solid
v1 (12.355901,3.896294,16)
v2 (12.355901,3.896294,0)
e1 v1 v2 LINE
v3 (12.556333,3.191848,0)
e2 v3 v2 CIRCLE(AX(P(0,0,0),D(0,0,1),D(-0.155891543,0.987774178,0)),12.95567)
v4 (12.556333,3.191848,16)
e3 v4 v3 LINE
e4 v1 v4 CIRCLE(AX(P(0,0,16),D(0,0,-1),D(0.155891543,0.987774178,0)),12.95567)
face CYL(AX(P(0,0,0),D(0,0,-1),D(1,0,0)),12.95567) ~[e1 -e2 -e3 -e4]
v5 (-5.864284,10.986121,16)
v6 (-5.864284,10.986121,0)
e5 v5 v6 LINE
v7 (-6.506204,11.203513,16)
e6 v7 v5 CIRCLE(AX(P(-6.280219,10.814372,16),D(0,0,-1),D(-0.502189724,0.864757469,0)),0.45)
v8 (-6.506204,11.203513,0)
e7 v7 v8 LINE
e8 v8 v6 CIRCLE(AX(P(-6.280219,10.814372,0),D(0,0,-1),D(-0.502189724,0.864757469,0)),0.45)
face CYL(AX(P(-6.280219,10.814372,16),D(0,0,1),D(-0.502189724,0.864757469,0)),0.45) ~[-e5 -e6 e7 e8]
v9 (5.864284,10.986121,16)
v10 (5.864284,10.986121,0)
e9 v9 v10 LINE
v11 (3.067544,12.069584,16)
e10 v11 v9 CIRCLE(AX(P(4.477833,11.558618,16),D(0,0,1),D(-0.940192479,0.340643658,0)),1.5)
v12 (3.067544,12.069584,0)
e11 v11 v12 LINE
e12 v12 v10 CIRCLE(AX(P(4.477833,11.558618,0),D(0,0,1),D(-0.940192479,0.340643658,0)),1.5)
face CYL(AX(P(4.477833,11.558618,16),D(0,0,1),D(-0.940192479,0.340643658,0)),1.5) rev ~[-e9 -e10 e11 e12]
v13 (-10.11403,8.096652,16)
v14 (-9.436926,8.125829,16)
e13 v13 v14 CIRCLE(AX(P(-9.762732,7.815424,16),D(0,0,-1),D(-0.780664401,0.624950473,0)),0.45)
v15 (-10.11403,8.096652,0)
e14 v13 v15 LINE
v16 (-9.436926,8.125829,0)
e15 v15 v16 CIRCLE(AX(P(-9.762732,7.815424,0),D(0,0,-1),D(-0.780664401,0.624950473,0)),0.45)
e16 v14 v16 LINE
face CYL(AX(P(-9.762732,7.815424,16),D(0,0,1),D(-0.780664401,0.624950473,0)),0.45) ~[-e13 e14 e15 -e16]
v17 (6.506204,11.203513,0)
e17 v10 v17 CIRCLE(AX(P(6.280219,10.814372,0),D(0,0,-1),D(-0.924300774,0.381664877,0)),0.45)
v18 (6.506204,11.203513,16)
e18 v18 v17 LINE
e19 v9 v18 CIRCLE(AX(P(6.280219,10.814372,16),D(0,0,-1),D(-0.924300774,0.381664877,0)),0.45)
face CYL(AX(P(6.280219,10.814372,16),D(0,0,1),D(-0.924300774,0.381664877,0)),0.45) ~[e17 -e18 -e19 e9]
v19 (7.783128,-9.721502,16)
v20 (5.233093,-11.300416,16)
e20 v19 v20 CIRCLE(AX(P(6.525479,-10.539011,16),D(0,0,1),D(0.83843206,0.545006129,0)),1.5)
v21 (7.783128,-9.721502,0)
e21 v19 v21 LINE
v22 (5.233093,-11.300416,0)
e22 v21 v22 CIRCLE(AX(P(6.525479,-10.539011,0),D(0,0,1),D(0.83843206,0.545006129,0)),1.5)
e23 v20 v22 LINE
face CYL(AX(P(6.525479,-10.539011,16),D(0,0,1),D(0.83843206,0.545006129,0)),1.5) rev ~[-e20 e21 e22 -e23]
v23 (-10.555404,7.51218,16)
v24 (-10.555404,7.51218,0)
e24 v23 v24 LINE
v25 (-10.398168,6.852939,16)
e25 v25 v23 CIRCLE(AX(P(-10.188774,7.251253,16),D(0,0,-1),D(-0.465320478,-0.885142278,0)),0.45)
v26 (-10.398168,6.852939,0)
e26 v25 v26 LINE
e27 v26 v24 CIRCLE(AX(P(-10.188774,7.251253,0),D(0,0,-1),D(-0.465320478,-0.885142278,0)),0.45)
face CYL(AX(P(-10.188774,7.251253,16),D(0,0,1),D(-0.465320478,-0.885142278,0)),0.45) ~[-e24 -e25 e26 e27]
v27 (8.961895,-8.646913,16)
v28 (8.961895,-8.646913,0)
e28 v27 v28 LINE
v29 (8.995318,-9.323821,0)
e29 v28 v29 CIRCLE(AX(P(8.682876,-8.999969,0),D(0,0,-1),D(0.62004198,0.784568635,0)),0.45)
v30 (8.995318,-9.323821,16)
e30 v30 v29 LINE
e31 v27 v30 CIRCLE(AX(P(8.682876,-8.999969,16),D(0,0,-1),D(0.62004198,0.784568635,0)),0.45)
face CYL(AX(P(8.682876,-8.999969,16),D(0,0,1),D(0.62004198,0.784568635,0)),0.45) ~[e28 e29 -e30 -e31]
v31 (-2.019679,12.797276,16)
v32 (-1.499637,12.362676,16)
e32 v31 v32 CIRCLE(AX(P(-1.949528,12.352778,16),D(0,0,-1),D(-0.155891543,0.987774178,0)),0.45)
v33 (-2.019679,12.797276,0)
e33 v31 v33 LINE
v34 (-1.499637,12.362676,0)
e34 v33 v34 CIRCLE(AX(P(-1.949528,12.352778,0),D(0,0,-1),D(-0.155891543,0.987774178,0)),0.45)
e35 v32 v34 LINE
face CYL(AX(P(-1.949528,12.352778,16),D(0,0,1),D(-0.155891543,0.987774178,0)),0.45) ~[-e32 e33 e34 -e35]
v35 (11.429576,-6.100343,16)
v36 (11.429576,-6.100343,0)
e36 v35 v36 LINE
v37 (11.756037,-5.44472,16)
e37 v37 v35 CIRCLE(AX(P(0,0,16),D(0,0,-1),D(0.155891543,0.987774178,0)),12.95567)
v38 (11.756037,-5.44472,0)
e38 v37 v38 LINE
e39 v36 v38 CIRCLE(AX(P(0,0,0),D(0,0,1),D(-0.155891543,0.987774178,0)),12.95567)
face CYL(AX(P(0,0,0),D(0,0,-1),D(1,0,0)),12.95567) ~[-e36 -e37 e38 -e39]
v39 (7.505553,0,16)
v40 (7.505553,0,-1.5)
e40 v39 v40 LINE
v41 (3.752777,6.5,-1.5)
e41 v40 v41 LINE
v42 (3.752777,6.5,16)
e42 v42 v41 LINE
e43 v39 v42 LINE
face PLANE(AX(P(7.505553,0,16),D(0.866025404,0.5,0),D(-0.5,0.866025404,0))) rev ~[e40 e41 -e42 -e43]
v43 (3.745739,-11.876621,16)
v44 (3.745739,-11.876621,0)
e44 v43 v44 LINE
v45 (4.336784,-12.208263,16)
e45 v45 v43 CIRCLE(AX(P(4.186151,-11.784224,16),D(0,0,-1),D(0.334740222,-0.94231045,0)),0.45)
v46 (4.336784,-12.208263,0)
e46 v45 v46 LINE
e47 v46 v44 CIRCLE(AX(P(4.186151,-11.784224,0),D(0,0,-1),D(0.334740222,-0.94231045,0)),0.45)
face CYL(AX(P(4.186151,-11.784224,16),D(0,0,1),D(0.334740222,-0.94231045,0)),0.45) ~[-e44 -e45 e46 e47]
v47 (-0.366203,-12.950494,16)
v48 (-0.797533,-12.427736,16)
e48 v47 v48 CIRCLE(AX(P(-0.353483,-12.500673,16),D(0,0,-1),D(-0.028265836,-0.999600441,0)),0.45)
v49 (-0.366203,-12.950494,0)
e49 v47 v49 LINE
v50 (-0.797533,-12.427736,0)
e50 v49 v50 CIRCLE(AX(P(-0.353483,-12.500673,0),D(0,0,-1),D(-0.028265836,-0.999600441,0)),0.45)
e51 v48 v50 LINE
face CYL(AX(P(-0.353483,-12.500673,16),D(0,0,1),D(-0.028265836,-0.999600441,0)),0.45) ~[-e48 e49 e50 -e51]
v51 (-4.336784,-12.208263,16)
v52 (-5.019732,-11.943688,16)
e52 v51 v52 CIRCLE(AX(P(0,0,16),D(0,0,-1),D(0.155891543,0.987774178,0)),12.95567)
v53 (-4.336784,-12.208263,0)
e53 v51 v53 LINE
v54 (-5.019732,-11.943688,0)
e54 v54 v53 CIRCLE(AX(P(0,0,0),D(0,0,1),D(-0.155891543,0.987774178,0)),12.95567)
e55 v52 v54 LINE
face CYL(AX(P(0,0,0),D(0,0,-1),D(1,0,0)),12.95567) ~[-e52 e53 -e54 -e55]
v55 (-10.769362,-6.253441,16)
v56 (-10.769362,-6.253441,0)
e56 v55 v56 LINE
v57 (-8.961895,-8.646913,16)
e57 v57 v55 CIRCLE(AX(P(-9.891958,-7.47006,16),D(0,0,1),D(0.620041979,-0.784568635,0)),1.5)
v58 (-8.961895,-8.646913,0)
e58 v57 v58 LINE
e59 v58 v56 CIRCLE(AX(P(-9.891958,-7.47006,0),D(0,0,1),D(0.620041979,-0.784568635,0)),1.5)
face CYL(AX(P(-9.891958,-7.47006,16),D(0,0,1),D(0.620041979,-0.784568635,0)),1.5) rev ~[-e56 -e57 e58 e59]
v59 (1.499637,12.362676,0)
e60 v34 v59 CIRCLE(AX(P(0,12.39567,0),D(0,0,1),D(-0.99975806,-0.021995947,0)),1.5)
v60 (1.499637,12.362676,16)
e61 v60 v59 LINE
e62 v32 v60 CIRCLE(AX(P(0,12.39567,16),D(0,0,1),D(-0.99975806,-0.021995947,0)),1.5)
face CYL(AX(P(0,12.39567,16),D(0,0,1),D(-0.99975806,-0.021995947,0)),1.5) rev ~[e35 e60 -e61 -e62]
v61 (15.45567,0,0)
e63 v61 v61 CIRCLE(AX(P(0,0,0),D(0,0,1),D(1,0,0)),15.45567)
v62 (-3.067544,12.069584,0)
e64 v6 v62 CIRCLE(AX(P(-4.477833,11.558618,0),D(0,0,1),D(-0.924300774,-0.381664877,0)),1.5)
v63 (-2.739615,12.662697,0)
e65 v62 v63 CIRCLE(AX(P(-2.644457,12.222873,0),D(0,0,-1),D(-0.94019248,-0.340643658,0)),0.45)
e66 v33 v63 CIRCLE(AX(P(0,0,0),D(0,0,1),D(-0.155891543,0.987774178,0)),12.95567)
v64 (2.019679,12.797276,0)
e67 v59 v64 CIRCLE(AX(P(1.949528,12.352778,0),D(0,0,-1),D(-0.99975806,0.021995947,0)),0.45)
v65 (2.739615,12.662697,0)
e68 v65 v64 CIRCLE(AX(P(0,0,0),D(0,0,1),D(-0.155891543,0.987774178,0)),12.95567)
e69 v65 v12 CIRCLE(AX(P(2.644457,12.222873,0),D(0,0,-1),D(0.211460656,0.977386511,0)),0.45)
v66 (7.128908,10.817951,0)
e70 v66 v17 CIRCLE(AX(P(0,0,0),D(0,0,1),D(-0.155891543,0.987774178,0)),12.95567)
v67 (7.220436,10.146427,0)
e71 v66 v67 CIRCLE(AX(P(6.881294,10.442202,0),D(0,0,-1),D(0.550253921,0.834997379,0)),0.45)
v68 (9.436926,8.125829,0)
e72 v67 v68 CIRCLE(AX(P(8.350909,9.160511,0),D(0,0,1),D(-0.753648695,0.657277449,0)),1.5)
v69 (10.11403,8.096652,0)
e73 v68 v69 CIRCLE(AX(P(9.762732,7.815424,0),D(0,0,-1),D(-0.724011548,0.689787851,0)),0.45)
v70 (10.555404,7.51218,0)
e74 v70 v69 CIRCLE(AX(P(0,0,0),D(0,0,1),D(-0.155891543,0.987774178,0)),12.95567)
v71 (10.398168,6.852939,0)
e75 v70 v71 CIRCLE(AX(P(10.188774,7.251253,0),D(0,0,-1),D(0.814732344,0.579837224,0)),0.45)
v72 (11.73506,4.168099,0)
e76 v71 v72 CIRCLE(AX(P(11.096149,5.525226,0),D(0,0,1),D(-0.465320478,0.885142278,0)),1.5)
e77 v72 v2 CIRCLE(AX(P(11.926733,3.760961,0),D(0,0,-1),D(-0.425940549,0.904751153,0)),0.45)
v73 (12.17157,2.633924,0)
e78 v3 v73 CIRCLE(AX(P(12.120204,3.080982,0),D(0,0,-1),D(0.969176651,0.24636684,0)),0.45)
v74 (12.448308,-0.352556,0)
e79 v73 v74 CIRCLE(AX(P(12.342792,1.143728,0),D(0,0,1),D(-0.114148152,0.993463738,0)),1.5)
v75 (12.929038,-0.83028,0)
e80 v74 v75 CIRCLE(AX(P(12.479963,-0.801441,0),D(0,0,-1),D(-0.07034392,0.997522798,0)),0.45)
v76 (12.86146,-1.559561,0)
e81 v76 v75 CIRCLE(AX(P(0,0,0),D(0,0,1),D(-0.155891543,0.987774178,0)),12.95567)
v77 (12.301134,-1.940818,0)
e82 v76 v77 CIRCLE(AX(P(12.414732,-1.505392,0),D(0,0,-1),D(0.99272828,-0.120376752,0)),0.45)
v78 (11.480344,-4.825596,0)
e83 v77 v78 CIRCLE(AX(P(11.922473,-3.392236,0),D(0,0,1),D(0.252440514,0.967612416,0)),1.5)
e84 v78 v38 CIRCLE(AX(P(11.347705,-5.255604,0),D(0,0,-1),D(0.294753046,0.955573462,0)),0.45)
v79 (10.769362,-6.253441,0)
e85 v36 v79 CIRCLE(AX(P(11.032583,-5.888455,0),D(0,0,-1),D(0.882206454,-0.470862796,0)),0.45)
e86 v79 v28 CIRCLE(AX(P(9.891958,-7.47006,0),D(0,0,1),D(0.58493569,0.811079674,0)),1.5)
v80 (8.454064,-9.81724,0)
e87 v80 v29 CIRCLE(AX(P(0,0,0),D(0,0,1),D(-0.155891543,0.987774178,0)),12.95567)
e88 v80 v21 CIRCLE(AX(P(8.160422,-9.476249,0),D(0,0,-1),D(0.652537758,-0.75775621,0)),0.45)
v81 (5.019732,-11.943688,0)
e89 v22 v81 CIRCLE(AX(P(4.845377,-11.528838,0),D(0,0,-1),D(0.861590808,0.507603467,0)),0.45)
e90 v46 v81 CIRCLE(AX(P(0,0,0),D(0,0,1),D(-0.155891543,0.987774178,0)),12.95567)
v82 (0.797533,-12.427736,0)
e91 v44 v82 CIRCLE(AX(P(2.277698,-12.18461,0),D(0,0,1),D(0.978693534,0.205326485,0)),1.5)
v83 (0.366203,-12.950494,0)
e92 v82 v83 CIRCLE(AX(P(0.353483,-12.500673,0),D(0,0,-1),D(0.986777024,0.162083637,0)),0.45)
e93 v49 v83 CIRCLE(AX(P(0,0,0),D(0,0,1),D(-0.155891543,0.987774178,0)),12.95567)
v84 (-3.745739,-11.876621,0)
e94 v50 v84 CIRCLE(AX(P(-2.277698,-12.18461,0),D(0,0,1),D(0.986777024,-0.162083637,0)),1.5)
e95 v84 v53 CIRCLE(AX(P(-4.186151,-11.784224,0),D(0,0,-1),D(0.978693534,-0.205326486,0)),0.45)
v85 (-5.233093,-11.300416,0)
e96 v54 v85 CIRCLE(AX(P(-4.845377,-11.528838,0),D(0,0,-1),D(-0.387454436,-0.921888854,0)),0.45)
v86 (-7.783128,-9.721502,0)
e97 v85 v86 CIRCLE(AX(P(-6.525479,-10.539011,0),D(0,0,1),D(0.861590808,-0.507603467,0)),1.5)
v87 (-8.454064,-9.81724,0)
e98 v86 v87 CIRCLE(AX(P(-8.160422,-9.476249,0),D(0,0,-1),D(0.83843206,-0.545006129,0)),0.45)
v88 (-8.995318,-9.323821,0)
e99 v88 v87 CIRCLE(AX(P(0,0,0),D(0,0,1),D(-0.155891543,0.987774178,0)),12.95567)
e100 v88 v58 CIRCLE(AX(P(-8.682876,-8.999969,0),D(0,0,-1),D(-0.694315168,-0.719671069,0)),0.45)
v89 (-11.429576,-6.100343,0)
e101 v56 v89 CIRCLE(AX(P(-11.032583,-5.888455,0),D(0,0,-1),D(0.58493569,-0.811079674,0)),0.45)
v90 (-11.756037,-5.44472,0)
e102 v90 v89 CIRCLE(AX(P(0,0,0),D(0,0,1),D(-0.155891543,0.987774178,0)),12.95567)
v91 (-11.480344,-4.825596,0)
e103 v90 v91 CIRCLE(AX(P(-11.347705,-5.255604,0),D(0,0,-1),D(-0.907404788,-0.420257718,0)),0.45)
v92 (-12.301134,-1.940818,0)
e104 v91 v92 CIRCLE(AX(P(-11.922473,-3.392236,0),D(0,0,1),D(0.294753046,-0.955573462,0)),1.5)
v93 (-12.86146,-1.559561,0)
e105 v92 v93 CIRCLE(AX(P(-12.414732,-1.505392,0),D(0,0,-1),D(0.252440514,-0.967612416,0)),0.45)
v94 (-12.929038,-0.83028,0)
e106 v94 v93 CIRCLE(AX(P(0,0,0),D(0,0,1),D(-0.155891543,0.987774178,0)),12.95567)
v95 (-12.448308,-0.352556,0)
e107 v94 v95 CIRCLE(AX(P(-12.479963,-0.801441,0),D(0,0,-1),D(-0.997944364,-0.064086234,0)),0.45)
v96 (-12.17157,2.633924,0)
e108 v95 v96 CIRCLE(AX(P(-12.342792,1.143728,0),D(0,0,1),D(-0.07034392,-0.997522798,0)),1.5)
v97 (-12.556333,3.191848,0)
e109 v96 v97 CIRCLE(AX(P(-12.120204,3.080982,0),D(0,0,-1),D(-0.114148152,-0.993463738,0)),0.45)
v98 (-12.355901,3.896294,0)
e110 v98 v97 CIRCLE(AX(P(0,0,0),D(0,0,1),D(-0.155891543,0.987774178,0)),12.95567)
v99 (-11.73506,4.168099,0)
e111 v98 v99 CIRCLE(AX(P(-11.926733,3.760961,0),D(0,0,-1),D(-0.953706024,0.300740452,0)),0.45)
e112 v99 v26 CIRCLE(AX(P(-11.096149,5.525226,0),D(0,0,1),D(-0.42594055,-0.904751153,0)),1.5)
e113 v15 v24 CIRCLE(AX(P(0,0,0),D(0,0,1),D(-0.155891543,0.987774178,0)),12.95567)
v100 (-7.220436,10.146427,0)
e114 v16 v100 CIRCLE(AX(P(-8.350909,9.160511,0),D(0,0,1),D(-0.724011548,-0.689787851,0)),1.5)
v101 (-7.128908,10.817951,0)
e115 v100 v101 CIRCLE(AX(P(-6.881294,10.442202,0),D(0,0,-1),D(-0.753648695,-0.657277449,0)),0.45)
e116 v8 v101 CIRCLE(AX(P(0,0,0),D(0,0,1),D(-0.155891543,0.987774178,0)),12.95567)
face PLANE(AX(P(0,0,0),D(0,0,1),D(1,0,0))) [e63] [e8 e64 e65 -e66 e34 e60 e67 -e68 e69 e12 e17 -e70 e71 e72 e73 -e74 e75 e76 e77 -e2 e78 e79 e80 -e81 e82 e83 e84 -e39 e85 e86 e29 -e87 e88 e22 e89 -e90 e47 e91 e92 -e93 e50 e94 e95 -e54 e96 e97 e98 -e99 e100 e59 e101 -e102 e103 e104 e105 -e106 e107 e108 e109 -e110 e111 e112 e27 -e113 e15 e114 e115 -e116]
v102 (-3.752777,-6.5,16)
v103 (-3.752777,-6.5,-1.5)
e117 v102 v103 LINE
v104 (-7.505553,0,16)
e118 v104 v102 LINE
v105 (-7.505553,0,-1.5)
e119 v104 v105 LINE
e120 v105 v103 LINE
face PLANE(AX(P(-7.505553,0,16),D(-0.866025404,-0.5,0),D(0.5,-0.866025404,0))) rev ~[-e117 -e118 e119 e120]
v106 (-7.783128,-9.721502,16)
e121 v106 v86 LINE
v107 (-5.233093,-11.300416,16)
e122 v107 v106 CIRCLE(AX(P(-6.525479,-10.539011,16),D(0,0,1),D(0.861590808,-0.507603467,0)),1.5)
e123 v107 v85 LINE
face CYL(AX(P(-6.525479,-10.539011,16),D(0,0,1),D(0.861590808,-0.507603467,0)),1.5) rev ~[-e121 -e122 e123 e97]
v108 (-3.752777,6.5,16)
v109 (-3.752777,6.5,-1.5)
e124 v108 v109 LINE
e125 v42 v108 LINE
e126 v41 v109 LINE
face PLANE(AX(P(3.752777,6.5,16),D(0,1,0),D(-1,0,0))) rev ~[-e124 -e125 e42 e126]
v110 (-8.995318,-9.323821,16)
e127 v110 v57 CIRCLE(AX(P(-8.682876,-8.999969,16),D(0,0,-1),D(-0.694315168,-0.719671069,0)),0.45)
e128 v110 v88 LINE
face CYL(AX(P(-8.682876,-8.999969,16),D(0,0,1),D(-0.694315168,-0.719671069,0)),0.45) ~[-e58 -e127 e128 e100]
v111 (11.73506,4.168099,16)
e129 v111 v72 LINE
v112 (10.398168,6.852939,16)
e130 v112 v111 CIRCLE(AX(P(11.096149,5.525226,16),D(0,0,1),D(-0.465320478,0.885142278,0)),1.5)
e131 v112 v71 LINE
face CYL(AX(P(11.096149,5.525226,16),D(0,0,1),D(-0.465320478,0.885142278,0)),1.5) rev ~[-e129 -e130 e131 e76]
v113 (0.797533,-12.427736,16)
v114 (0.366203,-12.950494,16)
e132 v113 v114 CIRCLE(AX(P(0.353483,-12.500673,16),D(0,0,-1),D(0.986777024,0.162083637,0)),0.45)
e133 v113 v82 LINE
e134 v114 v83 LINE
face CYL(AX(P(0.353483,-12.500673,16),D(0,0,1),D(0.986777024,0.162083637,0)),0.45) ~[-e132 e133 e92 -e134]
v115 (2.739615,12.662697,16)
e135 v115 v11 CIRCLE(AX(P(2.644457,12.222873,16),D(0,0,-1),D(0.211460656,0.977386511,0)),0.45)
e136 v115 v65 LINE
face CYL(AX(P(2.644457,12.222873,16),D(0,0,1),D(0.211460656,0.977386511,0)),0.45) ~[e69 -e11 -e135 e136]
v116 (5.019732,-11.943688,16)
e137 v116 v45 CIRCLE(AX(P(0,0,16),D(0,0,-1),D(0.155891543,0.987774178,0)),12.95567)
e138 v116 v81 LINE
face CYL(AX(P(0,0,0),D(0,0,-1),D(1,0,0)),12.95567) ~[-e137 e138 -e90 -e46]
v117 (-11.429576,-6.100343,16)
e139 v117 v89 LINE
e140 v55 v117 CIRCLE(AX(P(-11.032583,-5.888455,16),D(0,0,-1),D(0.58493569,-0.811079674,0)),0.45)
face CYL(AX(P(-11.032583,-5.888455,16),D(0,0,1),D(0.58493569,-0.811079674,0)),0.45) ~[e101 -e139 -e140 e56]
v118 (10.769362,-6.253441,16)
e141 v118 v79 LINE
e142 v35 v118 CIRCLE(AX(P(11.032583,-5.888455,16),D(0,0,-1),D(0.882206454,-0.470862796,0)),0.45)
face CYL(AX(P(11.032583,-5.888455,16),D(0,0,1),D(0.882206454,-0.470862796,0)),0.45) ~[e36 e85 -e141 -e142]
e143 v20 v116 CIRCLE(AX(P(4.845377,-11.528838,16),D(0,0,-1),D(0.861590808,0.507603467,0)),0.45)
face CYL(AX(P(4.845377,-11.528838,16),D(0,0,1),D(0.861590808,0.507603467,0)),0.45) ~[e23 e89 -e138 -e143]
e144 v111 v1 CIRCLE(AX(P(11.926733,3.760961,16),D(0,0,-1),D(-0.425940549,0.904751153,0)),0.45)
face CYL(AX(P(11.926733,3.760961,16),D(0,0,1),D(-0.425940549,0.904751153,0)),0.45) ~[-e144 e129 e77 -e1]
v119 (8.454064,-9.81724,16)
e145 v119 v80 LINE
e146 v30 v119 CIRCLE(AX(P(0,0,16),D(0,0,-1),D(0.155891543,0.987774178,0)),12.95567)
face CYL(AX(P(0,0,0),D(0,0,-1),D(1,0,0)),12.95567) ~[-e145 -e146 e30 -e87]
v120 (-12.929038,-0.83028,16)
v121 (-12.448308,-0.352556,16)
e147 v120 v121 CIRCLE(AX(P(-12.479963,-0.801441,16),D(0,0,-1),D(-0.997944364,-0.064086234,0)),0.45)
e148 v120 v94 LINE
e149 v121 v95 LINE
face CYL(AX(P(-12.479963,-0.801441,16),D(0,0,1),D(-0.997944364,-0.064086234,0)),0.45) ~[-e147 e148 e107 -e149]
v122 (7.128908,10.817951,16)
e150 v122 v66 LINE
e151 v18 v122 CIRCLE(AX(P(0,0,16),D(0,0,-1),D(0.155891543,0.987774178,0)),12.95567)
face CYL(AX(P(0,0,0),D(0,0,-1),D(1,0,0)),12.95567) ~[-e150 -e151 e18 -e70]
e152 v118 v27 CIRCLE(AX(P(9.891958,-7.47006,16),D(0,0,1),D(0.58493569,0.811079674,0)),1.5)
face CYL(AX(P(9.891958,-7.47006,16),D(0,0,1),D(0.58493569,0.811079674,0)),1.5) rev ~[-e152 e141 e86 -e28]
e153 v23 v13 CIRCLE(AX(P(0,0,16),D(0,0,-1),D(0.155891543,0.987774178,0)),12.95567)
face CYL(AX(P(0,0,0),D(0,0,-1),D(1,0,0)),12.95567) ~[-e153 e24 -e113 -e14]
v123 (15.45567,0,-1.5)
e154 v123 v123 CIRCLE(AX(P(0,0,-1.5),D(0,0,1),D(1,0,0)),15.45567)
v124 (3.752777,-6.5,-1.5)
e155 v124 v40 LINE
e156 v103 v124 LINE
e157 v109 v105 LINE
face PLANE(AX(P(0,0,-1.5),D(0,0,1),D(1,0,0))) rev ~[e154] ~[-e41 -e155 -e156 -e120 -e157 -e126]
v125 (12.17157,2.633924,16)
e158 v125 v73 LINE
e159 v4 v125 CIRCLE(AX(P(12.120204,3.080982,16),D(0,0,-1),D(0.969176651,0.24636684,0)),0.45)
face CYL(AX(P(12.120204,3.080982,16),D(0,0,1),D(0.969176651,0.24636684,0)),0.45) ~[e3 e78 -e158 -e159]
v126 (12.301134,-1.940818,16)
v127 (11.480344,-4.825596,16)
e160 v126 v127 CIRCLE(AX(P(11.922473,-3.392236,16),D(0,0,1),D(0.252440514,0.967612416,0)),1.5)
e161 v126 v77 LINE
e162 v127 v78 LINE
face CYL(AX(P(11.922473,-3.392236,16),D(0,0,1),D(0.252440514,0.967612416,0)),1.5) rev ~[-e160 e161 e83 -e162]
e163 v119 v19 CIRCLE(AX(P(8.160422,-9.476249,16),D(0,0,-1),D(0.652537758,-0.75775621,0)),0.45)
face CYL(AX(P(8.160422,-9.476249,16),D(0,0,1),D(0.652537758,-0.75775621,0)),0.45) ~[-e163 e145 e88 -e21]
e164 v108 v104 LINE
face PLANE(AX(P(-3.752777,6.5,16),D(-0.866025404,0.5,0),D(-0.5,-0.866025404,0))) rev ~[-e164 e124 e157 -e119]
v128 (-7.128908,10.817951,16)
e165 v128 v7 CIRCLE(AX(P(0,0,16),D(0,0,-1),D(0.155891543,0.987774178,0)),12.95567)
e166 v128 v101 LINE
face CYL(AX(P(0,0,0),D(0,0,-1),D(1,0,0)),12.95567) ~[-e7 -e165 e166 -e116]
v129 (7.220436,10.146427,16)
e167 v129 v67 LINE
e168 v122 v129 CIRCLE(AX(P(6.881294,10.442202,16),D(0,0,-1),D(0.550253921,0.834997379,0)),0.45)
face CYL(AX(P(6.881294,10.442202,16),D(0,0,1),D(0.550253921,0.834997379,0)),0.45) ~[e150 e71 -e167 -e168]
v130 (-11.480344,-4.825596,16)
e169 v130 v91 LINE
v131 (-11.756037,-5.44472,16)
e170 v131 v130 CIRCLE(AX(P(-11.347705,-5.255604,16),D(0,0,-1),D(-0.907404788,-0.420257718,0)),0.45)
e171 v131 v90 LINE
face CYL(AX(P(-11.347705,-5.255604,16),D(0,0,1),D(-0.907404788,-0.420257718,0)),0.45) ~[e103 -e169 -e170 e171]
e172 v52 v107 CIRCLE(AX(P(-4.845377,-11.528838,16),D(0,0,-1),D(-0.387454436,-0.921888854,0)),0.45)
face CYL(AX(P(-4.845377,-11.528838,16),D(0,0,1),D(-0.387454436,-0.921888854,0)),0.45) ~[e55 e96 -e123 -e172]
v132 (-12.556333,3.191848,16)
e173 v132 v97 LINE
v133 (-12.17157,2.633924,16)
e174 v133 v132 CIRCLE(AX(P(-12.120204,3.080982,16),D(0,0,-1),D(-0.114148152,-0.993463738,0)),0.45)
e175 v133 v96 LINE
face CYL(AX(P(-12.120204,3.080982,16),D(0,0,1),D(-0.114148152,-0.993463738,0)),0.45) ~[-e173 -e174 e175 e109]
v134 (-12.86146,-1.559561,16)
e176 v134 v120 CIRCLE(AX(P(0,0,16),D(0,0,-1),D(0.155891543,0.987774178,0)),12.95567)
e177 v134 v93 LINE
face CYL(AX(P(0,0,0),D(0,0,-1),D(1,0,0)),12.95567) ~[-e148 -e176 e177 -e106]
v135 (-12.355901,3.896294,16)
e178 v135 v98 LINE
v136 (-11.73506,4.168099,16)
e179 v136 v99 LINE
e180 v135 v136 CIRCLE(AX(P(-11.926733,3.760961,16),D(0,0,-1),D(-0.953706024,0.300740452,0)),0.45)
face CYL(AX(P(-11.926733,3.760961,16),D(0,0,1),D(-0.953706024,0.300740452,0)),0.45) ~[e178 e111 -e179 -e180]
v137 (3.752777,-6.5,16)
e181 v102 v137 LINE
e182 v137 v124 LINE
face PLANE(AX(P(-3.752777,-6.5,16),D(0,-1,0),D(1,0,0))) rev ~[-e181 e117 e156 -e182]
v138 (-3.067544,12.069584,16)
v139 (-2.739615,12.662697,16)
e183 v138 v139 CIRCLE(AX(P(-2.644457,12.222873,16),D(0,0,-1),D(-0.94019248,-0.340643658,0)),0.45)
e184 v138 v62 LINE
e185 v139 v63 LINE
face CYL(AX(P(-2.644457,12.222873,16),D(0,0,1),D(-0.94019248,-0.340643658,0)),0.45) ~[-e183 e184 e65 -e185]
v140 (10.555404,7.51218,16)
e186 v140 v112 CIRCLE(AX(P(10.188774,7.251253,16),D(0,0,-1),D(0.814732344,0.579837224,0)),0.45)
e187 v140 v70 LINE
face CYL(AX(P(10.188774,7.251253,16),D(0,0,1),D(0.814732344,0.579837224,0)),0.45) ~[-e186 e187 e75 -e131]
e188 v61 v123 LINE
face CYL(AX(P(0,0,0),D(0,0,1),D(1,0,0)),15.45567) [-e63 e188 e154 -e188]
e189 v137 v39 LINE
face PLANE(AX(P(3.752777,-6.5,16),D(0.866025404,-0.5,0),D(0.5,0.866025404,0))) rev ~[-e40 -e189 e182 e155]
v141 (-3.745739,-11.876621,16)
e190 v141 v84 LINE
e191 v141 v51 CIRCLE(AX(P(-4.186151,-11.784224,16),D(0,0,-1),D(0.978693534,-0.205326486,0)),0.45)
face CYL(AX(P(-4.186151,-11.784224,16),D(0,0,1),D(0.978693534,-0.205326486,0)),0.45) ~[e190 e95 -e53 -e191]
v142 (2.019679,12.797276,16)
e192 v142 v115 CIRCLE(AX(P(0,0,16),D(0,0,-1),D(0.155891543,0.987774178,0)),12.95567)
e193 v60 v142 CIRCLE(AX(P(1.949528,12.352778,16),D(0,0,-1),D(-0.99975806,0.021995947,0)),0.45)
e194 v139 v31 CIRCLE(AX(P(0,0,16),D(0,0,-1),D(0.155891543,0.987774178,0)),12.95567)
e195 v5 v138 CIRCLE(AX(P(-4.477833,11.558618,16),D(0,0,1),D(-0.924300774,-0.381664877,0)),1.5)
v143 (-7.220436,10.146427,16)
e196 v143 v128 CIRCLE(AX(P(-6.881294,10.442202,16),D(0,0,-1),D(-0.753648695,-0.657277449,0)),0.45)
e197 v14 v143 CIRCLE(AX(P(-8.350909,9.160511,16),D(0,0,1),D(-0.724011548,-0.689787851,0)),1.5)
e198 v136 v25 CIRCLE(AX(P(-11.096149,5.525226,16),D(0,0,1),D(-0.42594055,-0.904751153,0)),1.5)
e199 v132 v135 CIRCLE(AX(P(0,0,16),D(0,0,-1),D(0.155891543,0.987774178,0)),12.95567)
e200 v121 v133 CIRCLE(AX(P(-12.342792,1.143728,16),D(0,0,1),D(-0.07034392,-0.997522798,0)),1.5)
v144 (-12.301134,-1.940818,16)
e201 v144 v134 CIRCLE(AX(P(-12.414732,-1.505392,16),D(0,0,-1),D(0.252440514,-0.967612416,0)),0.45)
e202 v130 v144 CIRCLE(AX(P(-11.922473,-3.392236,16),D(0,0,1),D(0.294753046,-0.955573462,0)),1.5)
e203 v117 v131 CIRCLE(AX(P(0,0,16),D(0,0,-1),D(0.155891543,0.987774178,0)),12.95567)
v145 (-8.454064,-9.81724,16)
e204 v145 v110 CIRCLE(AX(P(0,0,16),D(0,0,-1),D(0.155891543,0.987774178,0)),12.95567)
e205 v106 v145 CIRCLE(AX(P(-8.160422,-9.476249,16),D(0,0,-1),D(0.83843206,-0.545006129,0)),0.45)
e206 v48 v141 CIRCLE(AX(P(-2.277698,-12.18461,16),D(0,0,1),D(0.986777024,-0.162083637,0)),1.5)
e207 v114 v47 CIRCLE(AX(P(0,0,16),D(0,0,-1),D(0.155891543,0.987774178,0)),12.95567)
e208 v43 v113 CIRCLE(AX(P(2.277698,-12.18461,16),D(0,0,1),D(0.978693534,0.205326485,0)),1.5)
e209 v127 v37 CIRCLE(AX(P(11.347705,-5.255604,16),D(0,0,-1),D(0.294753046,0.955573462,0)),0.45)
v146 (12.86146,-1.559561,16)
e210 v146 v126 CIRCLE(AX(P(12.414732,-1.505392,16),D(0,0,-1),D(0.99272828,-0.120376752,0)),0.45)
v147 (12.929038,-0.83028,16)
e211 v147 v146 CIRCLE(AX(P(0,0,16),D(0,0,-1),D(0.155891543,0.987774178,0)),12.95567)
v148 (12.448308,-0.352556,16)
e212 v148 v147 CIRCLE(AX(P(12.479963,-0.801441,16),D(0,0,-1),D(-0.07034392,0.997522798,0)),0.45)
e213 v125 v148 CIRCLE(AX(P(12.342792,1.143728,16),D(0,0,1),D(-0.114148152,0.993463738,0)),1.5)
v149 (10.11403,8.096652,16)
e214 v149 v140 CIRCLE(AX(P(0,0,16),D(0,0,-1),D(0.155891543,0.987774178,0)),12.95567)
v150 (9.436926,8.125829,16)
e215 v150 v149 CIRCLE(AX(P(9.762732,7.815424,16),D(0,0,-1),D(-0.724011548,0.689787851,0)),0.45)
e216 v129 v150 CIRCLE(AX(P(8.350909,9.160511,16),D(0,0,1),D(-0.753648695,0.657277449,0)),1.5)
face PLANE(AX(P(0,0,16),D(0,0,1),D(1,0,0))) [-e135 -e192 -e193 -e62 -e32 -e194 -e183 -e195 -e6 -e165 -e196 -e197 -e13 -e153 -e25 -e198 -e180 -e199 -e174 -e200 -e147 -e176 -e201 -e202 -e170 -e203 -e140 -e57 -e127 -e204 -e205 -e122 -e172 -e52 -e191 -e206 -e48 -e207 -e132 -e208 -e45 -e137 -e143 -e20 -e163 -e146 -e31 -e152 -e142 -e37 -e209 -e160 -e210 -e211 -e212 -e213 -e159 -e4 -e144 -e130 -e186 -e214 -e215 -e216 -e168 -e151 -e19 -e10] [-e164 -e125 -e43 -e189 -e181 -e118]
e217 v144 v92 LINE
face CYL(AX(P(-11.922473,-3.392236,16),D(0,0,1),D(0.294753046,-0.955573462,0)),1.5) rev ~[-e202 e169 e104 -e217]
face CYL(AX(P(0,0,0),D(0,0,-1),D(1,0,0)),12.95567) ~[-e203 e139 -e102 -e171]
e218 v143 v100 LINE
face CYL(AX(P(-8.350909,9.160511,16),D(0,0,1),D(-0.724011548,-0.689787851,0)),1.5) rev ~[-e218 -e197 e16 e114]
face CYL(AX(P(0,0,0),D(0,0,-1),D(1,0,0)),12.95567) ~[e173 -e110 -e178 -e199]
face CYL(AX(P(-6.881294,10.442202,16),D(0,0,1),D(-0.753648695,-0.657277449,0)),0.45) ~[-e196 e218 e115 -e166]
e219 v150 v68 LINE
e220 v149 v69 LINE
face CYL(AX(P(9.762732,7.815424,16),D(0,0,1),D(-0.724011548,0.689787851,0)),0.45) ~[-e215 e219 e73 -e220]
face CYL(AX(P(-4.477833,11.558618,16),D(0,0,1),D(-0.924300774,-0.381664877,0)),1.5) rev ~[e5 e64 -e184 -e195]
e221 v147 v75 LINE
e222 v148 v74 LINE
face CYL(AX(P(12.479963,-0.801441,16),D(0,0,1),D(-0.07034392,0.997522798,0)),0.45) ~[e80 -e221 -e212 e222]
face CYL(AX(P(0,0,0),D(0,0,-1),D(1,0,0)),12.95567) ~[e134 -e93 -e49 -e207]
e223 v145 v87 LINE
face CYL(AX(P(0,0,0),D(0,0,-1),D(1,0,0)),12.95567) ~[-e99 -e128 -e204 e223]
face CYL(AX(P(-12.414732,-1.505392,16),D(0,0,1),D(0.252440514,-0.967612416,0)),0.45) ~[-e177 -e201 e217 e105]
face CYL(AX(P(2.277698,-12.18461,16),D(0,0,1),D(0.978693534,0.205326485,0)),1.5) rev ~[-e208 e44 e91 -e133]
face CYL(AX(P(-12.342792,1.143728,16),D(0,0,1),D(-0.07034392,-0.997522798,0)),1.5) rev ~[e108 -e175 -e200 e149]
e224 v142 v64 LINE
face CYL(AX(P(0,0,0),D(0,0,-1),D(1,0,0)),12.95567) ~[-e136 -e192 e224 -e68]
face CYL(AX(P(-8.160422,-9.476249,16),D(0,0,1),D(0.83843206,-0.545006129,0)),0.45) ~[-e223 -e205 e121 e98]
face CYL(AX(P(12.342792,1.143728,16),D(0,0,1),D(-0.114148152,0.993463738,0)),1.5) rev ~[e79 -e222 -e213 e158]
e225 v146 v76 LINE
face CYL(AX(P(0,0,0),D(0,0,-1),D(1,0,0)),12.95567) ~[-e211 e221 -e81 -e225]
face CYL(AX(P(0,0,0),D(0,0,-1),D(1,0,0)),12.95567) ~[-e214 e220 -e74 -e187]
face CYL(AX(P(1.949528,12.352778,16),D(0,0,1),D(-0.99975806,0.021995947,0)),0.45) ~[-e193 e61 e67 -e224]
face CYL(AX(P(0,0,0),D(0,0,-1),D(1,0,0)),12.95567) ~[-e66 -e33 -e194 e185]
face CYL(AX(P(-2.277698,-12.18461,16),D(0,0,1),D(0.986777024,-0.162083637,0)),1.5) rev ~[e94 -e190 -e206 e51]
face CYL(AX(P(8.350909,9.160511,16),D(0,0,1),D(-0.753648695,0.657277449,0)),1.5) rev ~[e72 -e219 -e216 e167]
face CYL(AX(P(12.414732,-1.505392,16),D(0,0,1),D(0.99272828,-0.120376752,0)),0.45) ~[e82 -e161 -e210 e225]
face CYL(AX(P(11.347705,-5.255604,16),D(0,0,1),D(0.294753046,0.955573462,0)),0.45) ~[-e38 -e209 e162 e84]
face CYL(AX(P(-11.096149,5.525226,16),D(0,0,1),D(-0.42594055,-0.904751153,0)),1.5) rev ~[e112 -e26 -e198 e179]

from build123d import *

# Parameters (mm, degrees)
F2_R            = 12.9556701783
F3_DEPTH        = 16
F5_DEPTH        = 16
F5_COPIES_COUNT = 17
F8_R            = 15.4556701783
F8_R_2          = 12.9556701783
F9_DEPTH        = 1.5
F10_DEPTH       = 17.501


# Not quite as in the source:
# - a feature of the source that left no trace in its solid (it failed there, or was rolled back) is left out
# - a pattern or mirror of a feature is missing from the dataset's text; its kind, count and spacing are read off the source's solid


with BuildPart() as f3:
    # F2 (on Top) → F3 (new body)
    with BuildSketch(Plane.XY):
        Circle(F2_R)
    extrude(amount=F3_DEPTH)

    # F4 (on face) → F5 (cut, through all)
    with BuildSketch(Plane.XY.offset(16)):
        with BuildLine():
            ThreePointArc((-2.019679411, 12.797276462), (-1.6609629062, 12.6980751446), (-1.4996370898, 12.362676258))
            ThreePointArc((-1.4996370898, 12.362676258), (0, 10.8956701783), (1.4996370898, 12.362676258))
            ThreePointArc((1.4996370898, 12.362676258), (1.6609629062, 12.6980751446), (2.019679411, 12.797276462))
            ThreePointArc((2.019679411, 12.797276462), (0, 12.9556701783), (-2.019679411, 12.797276462))
        make_face()
    f5 = extrude(amount=-F5_DEPTH, mode=Mode.SUBTRACT)

    # F5_copies: F5 ×17 about axis
    f5_copies_axis = Axis((0, 0, 0), (0, 0, 1))
    for i in range(1, F5_COPIES_COUNT):
        add(f5.rotate(f5_copies_axis, i * 360 / F5_COPIES_COUNT), mode=Mode.SUBTRACT)

    # F8 (on face) + F2 (on Top) → F9 (join)
    with BuildSketch(Plane.XY):
        Circle(F8_R)
        Circle(F8_R_2, mode=Mode.SUBTRACT)
    with BuildSketch(Plane.XY):
        Circle(F2_R)
    extrude(amount=-F9_DEPTH)

    # F7 (on face) → F10 (cut, through all)
    with BuildSketch(Plane.XY.offset(16)):
        Polygon((3.7527767497, 6.5), (-3.7527767497, 6.5), (-7.5055534995, 0), (-3.7527767497, -6.5), (3.7527767497, -6.5), (7.5055534995, 0), align=None)
    extrude(amount=-F10_DEPTH, mode=Mode.SUBTRACT)


solid = f3.part
